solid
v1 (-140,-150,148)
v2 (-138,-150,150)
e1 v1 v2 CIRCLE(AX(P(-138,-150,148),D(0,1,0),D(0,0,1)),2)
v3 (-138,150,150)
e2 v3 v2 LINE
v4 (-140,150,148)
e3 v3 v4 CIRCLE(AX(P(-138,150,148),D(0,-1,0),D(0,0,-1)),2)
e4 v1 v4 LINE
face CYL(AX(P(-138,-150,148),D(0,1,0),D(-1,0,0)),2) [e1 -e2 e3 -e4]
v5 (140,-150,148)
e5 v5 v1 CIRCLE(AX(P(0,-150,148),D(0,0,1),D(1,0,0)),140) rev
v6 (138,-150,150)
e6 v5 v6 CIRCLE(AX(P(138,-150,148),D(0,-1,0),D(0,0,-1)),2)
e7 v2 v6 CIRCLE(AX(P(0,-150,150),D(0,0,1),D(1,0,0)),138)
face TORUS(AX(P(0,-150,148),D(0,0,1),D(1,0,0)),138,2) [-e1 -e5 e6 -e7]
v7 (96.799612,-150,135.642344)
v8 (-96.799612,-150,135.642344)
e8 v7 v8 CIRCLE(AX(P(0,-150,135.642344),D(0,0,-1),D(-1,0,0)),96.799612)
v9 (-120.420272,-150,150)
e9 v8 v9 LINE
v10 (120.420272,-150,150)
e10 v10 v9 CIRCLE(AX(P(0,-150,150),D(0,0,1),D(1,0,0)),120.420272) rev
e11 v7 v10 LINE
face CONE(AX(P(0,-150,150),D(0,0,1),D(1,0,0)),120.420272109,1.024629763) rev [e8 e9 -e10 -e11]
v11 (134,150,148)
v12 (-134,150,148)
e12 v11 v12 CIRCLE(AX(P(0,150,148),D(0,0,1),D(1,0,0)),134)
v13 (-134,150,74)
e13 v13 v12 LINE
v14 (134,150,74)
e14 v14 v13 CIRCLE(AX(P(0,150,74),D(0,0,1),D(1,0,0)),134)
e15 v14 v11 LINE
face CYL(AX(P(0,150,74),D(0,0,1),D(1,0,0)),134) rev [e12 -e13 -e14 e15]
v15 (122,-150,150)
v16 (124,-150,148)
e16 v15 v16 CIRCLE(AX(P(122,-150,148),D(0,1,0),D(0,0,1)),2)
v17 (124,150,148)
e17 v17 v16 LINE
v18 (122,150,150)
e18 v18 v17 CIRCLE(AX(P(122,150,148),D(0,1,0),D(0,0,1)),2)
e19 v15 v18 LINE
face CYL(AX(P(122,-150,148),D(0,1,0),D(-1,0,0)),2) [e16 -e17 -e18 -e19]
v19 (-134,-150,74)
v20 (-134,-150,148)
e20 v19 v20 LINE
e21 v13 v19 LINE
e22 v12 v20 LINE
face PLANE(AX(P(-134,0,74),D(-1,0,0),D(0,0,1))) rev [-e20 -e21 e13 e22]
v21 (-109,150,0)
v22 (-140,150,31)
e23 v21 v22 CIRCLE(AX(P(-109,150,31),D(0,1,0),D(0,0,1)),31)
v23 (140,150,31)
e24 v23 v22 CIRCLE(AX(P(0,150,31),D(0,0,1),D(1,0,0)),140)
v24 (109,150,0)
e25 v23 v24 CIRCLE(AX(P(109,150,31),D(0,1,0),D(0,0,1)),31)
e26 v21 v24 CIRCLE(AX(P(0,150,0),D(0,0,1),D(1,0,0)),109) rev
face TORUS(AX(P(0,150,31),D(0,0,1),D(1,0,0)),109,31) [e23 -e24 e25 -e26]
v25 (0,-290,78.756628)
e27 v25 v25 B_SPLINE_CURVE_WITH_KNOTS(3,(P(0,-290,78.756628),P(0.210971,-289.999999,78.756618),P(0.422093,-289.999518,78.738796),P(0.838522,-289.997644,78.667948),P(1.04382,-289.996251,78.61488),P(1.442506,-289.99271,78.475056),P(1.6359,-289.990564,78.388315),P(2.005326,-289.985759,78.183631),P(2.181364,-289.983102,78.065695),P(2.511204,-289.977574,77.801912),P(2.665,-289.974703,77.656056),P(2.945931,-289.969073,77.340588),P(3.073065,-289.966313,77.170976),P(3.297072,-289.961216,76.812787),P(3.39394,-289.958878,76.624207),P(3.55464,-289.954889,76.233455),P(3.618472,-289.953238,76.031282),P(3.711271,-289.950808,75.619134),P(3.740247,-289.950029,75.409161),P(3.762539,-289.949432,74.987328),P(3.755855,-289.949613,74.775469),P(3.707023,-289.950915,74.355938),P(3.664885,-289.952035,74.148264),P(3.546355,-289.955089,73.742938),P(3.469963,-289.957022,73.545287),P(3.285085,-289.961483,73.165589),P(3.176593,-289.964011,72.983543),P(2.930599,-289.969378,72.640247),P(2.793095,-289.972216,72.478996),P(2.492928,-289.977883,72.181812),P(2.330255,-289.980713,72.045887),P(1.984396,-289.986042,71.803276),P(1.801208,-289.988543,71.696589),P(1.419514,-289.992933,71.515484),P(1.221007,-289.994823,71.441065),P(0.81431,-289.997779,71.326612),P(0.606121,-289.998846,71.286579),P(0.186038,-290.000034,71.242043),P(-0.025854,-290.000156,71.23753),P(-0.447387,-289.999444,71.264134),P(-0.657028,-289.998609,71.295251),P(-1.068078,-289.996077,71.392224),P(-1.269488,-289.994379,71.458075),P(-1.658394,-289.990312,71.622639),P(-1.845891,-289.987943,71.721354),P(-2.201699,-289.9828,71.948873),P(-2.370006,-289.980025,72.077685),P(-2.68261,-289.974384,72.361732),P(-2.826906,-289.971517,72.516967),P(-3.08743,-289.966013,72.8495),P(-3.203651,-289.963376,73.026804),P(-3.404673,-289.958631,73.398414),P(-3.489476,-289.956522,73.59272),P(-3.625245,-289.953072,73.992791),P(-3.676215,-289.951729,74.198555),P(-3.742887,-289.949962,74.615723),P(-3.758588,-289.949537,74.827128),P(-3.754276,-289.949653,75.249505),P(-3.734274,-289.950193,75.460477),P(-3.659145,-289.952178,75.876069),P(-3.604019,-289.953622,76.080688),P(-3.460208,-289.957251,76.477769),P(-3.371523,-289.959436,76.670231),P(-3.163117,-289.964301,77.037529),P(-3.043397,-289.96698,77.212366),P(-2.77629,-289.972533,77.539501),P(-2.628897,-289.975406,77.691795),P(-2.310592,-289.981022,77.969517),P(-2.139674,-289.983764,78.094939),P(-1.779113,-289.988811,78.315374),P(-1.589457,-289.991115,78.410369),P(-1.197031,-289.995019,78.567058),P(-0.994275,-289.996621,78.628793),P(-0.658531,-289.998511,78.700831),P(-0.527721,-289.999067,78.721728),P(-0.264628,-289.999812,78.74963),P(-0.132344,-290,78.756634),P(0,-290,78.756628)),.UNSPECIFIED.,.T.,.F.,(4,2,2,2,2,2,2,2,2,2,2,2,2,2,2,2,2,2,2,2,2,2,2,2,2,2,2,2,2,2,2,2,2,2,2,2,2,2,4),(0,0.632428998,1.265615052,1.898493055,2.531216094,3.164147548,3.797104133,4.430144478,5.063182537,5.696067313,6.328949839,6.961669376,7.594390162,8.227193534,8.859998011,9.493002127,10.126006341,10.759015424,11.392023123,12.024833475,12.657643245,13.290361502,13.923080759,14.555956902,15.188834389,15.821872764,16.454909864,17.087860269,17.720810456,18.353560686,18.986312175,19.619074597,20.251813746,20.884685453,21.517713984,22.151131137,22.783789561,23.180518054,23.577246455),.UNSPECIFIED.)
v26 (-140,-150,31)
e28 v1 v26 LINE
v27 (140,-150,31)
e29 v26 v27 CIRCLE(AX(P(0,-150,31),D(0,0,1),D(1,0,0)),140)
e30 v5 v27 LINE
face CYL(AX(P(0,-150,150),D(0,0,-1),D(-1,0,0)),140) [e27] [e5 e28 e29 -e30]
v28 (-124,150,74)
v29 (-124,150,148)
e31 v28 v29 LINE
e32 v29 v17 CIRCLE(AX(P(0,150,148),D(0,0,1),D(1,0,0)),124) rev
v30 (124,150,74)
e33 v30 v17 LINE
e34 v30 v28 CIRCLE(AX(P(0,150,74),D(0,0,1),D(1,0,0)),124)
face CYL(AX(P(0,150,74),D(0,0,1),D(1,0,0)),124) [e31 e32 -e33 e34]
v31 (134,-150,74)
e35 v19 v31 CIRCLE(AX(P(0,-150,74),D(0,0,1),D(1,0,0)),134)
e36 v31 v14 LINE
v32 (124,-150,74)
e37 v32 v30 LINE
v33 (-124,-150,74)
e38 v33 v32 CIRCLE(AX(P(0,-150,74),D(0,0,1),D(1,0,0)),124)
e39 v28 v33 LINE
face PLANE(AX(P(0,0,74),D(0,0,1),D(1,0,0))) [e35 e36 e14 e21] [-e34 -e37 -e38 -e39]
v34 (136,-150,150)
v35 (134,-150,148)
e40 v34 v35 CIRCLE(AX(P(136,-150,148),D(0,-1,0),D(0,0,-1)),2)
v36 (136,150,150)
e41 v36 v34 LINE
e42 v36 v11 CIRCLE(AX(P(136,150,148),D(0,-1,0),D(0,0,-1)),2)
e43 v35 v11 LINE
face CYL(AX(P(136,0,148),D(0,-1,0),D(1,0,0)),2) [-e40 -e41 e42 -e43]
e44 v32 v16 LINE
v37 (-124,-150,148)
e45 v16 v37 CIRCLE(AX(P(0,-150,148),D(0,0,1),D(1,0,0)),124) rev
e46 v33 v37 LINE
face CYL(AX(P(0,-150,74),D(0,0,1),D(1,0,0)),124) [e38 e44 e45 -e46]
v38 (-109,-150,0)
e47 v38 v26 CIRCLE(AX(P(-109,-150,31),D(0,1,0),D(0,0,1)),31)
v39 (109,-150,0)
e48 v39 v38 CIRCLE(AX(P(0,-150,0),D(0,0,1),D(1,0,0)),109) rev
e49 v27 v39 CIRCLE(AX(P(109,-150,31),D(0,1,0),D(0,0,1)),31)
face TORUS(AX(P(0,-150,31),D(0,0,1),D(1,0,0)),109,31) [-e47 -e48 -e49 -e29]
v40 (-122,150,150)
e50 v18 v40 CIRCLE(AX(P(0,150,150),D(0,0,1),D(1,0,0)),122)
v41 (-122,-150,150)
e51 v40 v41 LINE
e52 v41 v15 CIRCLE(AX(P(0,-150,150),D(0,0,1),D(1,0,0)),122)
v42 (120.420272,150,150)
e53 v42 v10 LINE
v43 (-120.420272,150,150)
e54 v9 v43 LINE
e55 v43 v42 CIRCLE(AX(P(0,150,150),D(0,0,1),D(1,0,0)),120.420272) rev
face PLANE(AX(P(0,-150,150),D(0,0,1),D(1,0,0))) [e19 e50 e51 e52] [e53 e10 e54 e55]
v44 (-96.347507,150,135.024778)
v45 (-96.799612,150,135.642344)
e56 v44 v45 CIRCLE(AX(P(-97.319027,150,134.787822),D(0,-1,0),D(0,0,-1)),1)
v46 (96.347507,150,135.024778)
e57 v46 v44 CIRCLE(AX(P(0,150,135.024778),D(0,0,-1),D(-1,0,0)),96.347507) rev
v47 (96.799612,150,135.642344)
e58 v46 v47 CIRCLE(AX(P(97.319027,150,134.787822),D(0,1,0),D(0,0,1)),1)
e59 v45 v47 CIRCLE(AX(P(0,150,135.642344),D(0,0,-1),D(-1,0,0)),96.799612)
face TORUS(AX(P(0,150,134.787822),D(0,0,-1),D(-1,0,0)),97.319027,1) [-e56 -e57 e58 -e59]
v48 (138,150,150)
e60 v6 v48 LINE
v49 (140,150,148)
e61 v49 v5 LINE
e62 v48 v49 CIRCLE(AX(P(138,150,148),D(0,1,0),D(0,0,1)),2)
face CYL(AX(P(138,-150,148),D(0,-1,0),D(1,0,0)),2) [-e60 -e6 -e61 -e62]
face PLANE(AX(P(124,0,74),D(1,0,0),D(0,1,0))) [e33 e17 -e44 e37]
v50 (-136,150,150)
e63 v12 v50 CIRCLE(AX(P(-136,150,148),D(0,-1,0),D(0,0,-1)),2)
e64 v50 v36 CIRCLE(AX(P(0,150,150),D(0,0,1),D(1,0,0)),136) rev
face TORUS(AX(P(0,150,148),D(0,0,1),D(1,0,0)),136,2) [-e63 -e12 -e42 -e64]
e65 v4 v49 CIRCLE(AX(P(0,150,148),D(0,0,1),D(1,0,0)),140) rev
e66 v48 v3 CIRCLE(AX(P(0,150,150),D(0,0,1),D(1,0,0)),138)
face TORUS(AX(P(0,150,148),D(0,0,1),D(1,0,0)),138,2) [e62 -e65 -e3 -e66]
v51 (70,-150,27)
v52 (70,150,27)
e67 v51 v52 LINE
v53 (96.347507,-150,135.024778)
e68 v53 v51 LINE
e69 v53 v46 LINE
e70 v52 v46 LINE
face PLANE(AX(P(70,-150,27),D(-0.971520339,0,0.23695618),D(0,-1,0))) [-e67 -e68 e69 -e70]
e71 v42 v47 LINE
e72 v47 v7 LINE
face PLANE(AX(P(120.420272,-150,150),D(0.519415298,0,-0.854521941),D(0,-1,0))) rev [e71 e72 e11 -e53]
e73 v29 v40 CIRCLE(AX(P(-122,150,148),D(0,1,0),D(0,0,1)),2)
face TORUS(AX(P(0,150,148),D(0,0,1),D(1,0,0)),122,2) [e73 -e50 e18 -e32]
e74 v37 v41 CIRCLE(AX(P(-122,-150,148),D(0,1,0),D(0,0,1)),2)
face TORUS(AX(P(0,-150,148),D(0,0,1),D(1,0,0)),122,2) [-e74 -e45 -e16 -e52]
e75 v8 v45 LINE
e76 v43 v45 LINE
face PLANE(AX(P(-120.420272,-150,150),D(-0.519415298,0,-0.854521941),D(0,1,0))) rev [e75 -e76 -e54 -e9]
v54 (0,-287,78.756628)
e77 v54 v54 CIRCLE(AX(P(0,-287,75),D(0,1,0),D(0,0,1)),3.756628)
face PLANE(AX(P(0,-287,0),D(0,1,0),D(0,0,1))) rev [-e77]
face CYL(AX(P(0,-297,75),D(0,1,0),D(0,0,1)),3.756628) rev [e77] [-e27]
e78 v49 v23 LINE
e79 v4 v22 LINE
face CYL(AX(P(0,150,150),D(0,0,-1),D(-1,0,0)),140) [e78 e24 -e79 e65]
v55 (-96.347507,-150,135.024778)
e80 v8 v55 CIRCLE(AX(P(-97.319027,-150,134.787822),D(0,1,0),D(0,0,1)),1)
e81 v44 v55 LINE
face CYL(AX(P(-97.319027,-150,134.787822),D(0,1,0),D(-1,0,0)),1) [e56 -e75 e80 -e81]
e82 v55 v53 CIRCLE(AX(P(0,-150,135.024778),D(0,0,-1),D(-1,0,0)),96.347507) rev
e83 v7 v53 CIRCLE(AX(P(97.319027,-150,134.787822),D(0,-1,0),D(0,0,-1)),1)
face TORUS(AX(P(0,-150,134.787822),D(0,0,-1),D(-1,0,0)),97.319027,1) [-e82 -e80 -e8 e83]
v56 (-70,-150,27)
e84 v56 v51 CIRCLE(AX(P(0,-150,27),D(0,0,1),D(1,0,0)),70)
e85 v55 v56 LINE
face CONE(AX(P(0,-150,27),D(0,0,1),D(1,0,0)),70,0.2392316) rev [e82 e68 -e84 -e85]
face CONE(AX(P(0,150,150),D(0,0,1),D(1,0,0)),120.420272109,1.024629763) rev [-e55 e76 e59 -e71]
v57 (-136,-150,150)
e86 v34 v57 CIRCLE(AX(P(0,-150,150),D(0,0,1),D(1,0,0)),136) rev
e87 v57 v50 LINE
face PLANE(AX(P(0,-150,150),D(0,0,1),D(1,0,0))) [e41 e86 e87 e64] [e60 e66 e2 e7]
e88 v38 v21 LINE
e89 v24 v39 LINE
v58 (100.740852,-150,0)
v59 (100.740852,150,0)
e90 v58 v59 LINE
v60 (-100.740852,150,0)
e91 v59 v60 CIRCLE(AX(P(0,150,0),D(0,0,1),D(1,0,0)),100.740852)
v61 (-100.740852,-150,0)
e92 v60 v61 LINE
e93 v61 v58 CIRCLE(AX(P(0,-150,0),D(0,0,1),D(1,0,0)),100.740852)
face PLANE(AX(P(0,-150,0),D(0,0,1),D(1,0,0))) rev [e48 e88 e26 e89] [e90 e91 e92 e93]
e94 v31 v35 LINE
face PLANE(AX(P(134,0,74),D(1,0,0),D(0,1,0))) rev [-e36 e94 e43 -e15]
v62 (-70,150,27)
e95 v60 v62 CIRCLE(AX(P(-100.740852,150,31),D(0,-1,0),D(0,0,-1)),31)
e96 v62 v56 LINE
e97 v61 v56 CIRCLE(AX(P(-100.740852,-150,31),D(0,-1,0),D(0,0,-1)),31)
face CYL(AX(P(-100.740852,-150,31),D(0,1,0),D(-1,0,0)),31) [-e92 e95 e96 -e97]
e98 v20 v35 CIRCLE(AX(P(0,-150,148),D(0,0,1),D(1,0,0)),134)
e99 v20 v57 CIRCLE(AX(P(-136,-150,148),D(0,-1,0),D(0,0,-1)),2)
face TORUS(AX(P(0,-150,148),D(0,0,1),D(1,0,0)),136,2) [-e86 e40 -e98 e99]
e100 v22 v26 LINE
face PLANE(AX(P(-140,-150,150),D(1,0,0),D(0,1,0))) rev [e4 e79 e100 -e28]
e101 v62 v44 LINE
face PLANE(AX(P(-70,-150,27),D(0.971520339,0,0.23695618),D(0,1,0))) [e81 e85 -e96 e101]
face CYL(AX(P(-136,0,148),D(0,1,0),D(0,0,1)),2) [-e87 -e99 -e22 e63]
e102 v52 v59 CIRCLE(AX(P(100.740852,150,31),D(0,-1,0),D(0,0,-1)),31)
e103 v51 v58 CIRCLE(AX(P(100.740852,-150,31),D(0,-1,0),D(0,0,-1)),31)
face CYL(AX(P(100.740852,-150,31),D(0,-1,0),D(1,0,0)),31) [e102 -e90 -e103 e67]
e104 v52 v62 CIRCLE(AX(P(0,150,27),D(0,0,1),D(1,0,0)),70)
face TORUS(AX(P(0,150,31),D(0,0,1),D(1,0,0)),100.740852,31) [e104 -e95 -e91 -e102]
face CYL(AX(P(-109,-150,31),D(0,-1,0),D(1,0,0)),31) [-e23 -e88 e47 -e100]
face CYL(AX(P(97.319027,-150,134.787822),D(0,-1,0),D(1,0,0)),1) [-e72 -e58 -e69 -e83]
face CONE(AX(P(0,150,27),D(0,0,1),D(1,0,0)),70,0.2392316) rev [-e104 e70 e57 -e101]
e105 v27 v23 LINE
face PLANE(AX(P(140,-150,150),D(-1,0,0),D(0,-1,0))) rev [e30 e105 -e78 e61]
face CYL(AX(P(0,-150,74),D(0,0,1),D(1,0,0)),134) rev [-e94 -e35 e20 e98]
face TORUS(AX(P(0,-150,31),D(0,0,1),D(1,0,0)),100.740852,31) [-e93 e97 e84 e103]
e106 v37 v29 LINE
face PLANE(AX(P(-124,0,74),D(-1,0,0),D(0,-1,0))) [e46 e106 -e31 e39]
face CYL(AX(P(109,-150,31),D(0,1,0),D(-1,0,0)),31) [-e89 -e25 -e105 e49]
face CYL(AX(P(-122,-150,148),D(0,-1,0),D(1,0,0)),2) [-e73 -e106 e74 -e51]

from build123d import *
from OCP.BRepFilletAPI import BRepFilletAPI_MakeChamfer

# Parameters (mm, degrees)
Y_KSEKLIK_EKSTR_ZYON1_DEPTH = 150
KES_EKSTR_ZYON1_DEPTH       = 150
PAH1_SIZE                   = 30
PAH1_SIZE2                  = 123
KES_EKSTR_ZYON2_DEPTH       = 76
KES_EKSTR_ZYON3_START       = -287
KES_EKSTR_ZYON3_DEPTH       = 10
RADYUS1_R                   = 31
RADYUS2_R                   = 2
PAH2_SIZE                   = 15
PAH2_SIZE2                  = 20.420272109
RADYUS3_R                   = 1


with BuildPart() as part:
    # Çizim1 → Yükseklik-Ekstrüzyon1 (new body)
    with BuildSketch(Plane.XY):
        with BuildLine():
            Line((-140, -150), (-140, 150))
            ThreePointArc((-140, 150), (0, 290), (140, 150))
            Line((140, 150), (140, -150))
            ThreePointArc((140, -150), (0, -290), (-140, -150))
        make_face()
    extrude(amount=Y_KSEKLIK_EKSTR_ZYON1_DEPTH)

    # Çizim2 → Kes-Ekstrüzyon1 (cut)
    with BuildSketch(Plane.XY.offset(150)):
        with BuildLine():
            Line((-70, -150), (-70, 150))
            ThreePointArc((-70, 150), (0, 220), (70, 150))
            Line((70, 150), (70, -150))
            ThreePointArc((70, -150), (0, -220), (-70, -150))
        make_face()
    extrude(amount=-KES_EKSTR_ZYON1_DEPTH, mode=Mode.SUBTRACT)

    # Pah1
    pah1_edges = [part.edges().sort_by_distance(p)[0] for p in [
        (0, -220, 150),
        (70, 0, 150),
        (0, 220, 150),
        (-70, 0, 150),
    ]]
    pah1_side = [part.faces().sort_by_distance(p)[0] for p in [
        (133.559503125, 0, 150),
    ]]
    chamfer(pah1_edges, length=PAH1_SIZE, length2=PAH1_SIZE2, reference=pah1_side[0])

    # Çizim3 → Kes-Ekstrüzyon2 (cut)
    with BuildSketch(Plane.XY.offset(150)):
        with BuildLine():
            Line((-134, 150), (-134, -150))
            ThreePointArc((-134, -150), (0, -284), (134, -150))
            Line((134, -150), (134, 150))
            ThreePointArc((134, 150), (0, 284), (-134, 150))
        make_face()
        with BuildLine():
            ThreePointArc((-124, -150), (0, -274), (124, -150))
            Line((124, -150), (124, 150))
            ThreePointArc((124, 150), (0, 274), (-124, 150))
            Line((-124, 150), (-124, -150))
        make_face(mode=Mode.SUBTRACT)
    extrude(amount=-KES_EKSTR_ZYON2_DEPTH, mode=Mode.SUBTRACT)

    # Çizim4 → Kes-Ekstrüzyon3 (cut)
    with BuildSketch(Plane(origin=(0, 0, 0), x_dir=(1, 0, 0), z_dir=(0, 1, 0)).offset(KES_EKSTR_ZYON3_START)):
        with BuildLine():
            ThreePointArc((3.756627764, -75), (2.656336966, -72.343663034), (0, -71.243372236))
            Line((0, -71.243372236), (0, -78.756627764))
            ThreePointArc((0, -78.756627764), (2.656336966, -77.656336966), (3.756627764, -75))
        make_face()
        with BuildLine():
            Line((0, -78.756627764), (0, -71.243372236))
            ThreePointArc((0, -71.243372236), (-3.756627764, -75), (0, -78.756627764))
        make_face()
    extrude(amount=-KES_EKSTR_ZYON3_DEPTH, mode=Mode.SUBTRACT)

    # Radyus1
    # the kernel refuses this fillet: 31 mm, written as the material it takes off along each edge
    with BuildSketch(Plane(origin=(0, -150, 0), x_dir=(1, 0, 0), z_dir=(0, 1, 0))) as radyus1_piece_1:
        with BuildLine():
            CenterArc((100.740852298, -31), RADYUS1_R, 90, 82.586326198)
            Line((70, -27), (69.385182954, -26.92))
            ThreePointArc((69.385182954, -26.92), (69.38, -13.5), (69.38, 0))
            Line((69.38, 0), (70, 0.62))
            Line((70, 0.62), (100.740852298, 0.62))
            Line((100.740852298, 0.62), (100.740852298, 0))
        make_face()
    revolve(axis=Axis((0, -150, 0), (0, 0, -1)), revolution_arc=180, mode=Mode.SUBTRACT)
    with BuildSketch(Plane(origin=(-70, -150, 0), x_dir=(-1, 0, 0), z_dir=(0, 1, 0)), Plane(origin=(70, 150, 0), x_dir=(1, 0, 0), z_dir=(0, -1, 0))) as radyus1_piece_2:
        with BuildLine():
            CenterArc((30.740852298, 31), RADYUS1_R, 187.413673802, 82.586326198)
            Line((0, 27), (-0.614817046, 26.92))
            ThreePointArc((-0.614817046, 26.92), (-0.62, 13.5), (-0.62, 0))
            Line((-0.62, 0), (0, -0.62))
            Line((0, -0.62), (30.740852298, -0.62))
            Line((30.740852298, -0.62), (30.740852298, 0))
        make_face()
    extrude(amount=300, mode=Mode.SUBTRACT)
    with BuildSketch(Plane(origin=(0, 150, 0), x_dir=(-1, 0, 0), z_dir=(0, -1, 0))) as radyus1_piece_3:
        with BuildLine():
            CenterArc((100.740852298, -31), RADYUS1_R, 90, 82.586326198)
            Line((70, -27), (69.385182954, -26.92))
            ThreePointArc((69.385182954, -26.92), (69.38, -13.5), (69.38, 0))
            Line((69.38, 0), (70, 0.62))
            Line((70, 0.62), (100.740852298, 0.62))
            Line((100.740852298, 0.62), (100.740852298, 0))
        make_face()
    revolve(axis=Axis((0, 150, 0), (0, 0, -1)), revolution_arc=180, mode=Mode.SUBTRACT)
    with BuildSketch(Plane(origin=(0, 150, 0), x_dir=(-1, 0, 0), z_dir=(0, -1, 0))) as radyus1_piece_4:
        with BuildLine():
            CenterArc((140 - RADYUS1_R, -RADYUS1_R), RADYUS1_R, 0, 90)
            Line((140 - RADYUS1_R, 0), (140 - RADYUS1_R, RADYUS1_R * 0.02))
            Line((140 - RADYUS1_R, RADYUS1_R * 0.02), (140 + RADYUS1_R * 0.02, RADYUS1_R * 0.02))
            Line((140 + RADYUS1_R * 0.02, RADYUS1_R * 0.02), (140 + RADYUS1_R * 0.02, -RADYUS1_R))
            Line((140 + RADYUS1_R * 0.02, -RADYUS1_R), (140, -RADYUS1_R))
        make_face()
    revolve(axis=Axis((0, 150, 0), (0, 0, -1)), revolution_arc=180, mode=Mode.SUBTRACT)
    with BuildSketch(Plane(origin=(140, 150, 0), x_dir=(0, 0, 1), z_dir=(0, -1, 0)), Plane(origin=(-140, -150, 0), x_dir=(0, 0, 1), z_dir=(0, 1, 0))) as radyus1_piece_5:
        with BuildLine():
            CenterArc((RADYUS1_R, RADYUS1_R), RADYUS1_R, 180, 90)
            Line((0, RADYUS1_R), (-RADYUS1_R * 0.02, RADYUS1_R))
            Line((-RADYUS1_R * 0.02, RADYUS1_R), (-RADYUS1_R * 0.02, -RADYUS1_R * 0.02))
            Line((-RADYUS1_R * 0.02, -RADYUS1_R * 0.02), (RADYUS1_R, -RADYUS1_R * 0.02))
            Line((RADYUS1_R, -RADYUS1_R * 0.02), (RADYUS1_R, 0))
        make_face()
    extrude(amount=300, mode=Mode.SUBTRACT)
    with BuildSketch(Plane(origin=(0, -150, 0), x_dir=(1, 0, 0), z_dir=(0, 1, 0))) as radyus1_piece_6:
        with BuildLine():
            CenterArc((140 - RADYUS1_R, -RADYUS1_R), RADYUS1_R, 0, 90)
            Line((140 - RADYUS1_R, 0), (140 - RADYUS1_R, RADYUS1_R * 0.02))
            Line((140 - RADYUS1_R, RADYUS1_R * 0.02), (140 + RADYUS1_R * 0.02, RADYUS1_R * 0.02))
            Line((140 + RADYUS1_R * 0.02, RADYUS1_R * 0.02), (140 + RADYUS1_R * 0.02, -RADYUS1_R))
            Line((140 + RADYUS1_R * 0.02, -RADYUS1_R), (140, -RADYUS1_R))
        make_face()
    revolve(axis=Axis((0, -150, 0), (0, 0, -1)), revolution_arc=180, mode=Mode.SUBTRACT)

    # Radyus2
    radyus2_edges = [part.edges().sort_by_distance(p)[0] for p in [
        (0, 290, 150),
        (-140, 0, 150),
        (0, -290, 150),
        (0, -274, 150),
        (124, 0, 150),
        (0, 274, 150),
        (-124, 0, 150),
        (-134, 0, 150),
        (0, -284, 150),
        (134, 0, 150),
        (0, 284, 150),
        (140, 0, 150),
    ]]
    fillet(radyus2_edges, radius=RADYUS2_R)

    # Pah2: one chamfer whose edges measure the first distance from different faces: ONE call of the kernel's chamfer builder (chamfer() names one face for all edges)
    pah2_edges_1 = [part.edges().sort_by_distance(p)[0] for p in [
        (100, 0, 150),
    ]]
    pah2_side_1 = [part.faces().sort_by_distance(p)[0] for p in [
        (85, 0, 88.5),
    ]]
    pah2_edges_2 = [part.edges().sort_by_distance(p)[0] for p in [
        (0, 250, 150),
    ]]
    pah2_side_2 = [part.faces().sort_by_distance(p)[0] for p in [
        (0, 235, 88.5),
    ]]
    pah2_edges_3 = [part.edges().sort_by_distance(p)[0] for p in [
        (0, -250, 150),
    ]]
    pah2_side_3 = [part.faces().sort_by_distance(p)[0] for p in [
        (0, -235, 88.5),
    ]]
    pah2_edges_4 = [part.edges().sort_by_distance(p)[0] for p in [
        (-100, 0, 150),
    ]]
    pah2_side_4 = [part.faces().sort_by_distance(p)[0] for p in [
        (-85, 0, 88.5),
    ]]
    pah2 = BRepFilletAPI_MakeChamfer(part.part.solid().wrapped)
    for e in pah2_edges_1:
        pah2.Add(PAH2_SIZE, PAH2_SIZE2, e.wrapped, pah2_side_1[0].wrapped)  # the first distance lies on this face
    for e in pah2_edges_2:
        pah2.Add(PAH2_SIZE, PAH2_SIZE2, e.wrapped, pah2_side_2[0].wrapped)  # the first distance lies on this face
    for e in pah2_edges_3:
        pah2.Add(PAH2_SIZE, PAH2_SIZE2, e.wrapped, pah2_side_3[0].wrapped)  # the first distance lies on this face
    for e in pah2_edges_4:
        pah2.Add(PAH2_SIZE, PAH2_SIZE2, e.wrapped, pah2_side_4[0].wrapped)  # the first distance lies on this face
    add(Compound.cast(pah2.Shape()), mode=Mode.REPLACE)

    # Radyus3
    radyus3_edges = [part.edges().sort_by_distance(p)[0] for p in [
        (96.445657297, 0, 135.427194918),
        (0, -246.445657297, 135.427194918),
        (0, 246.445657297, 135.427194918),
        (-96.445657297, 0, 135.427194918),
    ]]
    fillet(radyus3_edges, radius=RADYUS3_R)


solid = part.part
